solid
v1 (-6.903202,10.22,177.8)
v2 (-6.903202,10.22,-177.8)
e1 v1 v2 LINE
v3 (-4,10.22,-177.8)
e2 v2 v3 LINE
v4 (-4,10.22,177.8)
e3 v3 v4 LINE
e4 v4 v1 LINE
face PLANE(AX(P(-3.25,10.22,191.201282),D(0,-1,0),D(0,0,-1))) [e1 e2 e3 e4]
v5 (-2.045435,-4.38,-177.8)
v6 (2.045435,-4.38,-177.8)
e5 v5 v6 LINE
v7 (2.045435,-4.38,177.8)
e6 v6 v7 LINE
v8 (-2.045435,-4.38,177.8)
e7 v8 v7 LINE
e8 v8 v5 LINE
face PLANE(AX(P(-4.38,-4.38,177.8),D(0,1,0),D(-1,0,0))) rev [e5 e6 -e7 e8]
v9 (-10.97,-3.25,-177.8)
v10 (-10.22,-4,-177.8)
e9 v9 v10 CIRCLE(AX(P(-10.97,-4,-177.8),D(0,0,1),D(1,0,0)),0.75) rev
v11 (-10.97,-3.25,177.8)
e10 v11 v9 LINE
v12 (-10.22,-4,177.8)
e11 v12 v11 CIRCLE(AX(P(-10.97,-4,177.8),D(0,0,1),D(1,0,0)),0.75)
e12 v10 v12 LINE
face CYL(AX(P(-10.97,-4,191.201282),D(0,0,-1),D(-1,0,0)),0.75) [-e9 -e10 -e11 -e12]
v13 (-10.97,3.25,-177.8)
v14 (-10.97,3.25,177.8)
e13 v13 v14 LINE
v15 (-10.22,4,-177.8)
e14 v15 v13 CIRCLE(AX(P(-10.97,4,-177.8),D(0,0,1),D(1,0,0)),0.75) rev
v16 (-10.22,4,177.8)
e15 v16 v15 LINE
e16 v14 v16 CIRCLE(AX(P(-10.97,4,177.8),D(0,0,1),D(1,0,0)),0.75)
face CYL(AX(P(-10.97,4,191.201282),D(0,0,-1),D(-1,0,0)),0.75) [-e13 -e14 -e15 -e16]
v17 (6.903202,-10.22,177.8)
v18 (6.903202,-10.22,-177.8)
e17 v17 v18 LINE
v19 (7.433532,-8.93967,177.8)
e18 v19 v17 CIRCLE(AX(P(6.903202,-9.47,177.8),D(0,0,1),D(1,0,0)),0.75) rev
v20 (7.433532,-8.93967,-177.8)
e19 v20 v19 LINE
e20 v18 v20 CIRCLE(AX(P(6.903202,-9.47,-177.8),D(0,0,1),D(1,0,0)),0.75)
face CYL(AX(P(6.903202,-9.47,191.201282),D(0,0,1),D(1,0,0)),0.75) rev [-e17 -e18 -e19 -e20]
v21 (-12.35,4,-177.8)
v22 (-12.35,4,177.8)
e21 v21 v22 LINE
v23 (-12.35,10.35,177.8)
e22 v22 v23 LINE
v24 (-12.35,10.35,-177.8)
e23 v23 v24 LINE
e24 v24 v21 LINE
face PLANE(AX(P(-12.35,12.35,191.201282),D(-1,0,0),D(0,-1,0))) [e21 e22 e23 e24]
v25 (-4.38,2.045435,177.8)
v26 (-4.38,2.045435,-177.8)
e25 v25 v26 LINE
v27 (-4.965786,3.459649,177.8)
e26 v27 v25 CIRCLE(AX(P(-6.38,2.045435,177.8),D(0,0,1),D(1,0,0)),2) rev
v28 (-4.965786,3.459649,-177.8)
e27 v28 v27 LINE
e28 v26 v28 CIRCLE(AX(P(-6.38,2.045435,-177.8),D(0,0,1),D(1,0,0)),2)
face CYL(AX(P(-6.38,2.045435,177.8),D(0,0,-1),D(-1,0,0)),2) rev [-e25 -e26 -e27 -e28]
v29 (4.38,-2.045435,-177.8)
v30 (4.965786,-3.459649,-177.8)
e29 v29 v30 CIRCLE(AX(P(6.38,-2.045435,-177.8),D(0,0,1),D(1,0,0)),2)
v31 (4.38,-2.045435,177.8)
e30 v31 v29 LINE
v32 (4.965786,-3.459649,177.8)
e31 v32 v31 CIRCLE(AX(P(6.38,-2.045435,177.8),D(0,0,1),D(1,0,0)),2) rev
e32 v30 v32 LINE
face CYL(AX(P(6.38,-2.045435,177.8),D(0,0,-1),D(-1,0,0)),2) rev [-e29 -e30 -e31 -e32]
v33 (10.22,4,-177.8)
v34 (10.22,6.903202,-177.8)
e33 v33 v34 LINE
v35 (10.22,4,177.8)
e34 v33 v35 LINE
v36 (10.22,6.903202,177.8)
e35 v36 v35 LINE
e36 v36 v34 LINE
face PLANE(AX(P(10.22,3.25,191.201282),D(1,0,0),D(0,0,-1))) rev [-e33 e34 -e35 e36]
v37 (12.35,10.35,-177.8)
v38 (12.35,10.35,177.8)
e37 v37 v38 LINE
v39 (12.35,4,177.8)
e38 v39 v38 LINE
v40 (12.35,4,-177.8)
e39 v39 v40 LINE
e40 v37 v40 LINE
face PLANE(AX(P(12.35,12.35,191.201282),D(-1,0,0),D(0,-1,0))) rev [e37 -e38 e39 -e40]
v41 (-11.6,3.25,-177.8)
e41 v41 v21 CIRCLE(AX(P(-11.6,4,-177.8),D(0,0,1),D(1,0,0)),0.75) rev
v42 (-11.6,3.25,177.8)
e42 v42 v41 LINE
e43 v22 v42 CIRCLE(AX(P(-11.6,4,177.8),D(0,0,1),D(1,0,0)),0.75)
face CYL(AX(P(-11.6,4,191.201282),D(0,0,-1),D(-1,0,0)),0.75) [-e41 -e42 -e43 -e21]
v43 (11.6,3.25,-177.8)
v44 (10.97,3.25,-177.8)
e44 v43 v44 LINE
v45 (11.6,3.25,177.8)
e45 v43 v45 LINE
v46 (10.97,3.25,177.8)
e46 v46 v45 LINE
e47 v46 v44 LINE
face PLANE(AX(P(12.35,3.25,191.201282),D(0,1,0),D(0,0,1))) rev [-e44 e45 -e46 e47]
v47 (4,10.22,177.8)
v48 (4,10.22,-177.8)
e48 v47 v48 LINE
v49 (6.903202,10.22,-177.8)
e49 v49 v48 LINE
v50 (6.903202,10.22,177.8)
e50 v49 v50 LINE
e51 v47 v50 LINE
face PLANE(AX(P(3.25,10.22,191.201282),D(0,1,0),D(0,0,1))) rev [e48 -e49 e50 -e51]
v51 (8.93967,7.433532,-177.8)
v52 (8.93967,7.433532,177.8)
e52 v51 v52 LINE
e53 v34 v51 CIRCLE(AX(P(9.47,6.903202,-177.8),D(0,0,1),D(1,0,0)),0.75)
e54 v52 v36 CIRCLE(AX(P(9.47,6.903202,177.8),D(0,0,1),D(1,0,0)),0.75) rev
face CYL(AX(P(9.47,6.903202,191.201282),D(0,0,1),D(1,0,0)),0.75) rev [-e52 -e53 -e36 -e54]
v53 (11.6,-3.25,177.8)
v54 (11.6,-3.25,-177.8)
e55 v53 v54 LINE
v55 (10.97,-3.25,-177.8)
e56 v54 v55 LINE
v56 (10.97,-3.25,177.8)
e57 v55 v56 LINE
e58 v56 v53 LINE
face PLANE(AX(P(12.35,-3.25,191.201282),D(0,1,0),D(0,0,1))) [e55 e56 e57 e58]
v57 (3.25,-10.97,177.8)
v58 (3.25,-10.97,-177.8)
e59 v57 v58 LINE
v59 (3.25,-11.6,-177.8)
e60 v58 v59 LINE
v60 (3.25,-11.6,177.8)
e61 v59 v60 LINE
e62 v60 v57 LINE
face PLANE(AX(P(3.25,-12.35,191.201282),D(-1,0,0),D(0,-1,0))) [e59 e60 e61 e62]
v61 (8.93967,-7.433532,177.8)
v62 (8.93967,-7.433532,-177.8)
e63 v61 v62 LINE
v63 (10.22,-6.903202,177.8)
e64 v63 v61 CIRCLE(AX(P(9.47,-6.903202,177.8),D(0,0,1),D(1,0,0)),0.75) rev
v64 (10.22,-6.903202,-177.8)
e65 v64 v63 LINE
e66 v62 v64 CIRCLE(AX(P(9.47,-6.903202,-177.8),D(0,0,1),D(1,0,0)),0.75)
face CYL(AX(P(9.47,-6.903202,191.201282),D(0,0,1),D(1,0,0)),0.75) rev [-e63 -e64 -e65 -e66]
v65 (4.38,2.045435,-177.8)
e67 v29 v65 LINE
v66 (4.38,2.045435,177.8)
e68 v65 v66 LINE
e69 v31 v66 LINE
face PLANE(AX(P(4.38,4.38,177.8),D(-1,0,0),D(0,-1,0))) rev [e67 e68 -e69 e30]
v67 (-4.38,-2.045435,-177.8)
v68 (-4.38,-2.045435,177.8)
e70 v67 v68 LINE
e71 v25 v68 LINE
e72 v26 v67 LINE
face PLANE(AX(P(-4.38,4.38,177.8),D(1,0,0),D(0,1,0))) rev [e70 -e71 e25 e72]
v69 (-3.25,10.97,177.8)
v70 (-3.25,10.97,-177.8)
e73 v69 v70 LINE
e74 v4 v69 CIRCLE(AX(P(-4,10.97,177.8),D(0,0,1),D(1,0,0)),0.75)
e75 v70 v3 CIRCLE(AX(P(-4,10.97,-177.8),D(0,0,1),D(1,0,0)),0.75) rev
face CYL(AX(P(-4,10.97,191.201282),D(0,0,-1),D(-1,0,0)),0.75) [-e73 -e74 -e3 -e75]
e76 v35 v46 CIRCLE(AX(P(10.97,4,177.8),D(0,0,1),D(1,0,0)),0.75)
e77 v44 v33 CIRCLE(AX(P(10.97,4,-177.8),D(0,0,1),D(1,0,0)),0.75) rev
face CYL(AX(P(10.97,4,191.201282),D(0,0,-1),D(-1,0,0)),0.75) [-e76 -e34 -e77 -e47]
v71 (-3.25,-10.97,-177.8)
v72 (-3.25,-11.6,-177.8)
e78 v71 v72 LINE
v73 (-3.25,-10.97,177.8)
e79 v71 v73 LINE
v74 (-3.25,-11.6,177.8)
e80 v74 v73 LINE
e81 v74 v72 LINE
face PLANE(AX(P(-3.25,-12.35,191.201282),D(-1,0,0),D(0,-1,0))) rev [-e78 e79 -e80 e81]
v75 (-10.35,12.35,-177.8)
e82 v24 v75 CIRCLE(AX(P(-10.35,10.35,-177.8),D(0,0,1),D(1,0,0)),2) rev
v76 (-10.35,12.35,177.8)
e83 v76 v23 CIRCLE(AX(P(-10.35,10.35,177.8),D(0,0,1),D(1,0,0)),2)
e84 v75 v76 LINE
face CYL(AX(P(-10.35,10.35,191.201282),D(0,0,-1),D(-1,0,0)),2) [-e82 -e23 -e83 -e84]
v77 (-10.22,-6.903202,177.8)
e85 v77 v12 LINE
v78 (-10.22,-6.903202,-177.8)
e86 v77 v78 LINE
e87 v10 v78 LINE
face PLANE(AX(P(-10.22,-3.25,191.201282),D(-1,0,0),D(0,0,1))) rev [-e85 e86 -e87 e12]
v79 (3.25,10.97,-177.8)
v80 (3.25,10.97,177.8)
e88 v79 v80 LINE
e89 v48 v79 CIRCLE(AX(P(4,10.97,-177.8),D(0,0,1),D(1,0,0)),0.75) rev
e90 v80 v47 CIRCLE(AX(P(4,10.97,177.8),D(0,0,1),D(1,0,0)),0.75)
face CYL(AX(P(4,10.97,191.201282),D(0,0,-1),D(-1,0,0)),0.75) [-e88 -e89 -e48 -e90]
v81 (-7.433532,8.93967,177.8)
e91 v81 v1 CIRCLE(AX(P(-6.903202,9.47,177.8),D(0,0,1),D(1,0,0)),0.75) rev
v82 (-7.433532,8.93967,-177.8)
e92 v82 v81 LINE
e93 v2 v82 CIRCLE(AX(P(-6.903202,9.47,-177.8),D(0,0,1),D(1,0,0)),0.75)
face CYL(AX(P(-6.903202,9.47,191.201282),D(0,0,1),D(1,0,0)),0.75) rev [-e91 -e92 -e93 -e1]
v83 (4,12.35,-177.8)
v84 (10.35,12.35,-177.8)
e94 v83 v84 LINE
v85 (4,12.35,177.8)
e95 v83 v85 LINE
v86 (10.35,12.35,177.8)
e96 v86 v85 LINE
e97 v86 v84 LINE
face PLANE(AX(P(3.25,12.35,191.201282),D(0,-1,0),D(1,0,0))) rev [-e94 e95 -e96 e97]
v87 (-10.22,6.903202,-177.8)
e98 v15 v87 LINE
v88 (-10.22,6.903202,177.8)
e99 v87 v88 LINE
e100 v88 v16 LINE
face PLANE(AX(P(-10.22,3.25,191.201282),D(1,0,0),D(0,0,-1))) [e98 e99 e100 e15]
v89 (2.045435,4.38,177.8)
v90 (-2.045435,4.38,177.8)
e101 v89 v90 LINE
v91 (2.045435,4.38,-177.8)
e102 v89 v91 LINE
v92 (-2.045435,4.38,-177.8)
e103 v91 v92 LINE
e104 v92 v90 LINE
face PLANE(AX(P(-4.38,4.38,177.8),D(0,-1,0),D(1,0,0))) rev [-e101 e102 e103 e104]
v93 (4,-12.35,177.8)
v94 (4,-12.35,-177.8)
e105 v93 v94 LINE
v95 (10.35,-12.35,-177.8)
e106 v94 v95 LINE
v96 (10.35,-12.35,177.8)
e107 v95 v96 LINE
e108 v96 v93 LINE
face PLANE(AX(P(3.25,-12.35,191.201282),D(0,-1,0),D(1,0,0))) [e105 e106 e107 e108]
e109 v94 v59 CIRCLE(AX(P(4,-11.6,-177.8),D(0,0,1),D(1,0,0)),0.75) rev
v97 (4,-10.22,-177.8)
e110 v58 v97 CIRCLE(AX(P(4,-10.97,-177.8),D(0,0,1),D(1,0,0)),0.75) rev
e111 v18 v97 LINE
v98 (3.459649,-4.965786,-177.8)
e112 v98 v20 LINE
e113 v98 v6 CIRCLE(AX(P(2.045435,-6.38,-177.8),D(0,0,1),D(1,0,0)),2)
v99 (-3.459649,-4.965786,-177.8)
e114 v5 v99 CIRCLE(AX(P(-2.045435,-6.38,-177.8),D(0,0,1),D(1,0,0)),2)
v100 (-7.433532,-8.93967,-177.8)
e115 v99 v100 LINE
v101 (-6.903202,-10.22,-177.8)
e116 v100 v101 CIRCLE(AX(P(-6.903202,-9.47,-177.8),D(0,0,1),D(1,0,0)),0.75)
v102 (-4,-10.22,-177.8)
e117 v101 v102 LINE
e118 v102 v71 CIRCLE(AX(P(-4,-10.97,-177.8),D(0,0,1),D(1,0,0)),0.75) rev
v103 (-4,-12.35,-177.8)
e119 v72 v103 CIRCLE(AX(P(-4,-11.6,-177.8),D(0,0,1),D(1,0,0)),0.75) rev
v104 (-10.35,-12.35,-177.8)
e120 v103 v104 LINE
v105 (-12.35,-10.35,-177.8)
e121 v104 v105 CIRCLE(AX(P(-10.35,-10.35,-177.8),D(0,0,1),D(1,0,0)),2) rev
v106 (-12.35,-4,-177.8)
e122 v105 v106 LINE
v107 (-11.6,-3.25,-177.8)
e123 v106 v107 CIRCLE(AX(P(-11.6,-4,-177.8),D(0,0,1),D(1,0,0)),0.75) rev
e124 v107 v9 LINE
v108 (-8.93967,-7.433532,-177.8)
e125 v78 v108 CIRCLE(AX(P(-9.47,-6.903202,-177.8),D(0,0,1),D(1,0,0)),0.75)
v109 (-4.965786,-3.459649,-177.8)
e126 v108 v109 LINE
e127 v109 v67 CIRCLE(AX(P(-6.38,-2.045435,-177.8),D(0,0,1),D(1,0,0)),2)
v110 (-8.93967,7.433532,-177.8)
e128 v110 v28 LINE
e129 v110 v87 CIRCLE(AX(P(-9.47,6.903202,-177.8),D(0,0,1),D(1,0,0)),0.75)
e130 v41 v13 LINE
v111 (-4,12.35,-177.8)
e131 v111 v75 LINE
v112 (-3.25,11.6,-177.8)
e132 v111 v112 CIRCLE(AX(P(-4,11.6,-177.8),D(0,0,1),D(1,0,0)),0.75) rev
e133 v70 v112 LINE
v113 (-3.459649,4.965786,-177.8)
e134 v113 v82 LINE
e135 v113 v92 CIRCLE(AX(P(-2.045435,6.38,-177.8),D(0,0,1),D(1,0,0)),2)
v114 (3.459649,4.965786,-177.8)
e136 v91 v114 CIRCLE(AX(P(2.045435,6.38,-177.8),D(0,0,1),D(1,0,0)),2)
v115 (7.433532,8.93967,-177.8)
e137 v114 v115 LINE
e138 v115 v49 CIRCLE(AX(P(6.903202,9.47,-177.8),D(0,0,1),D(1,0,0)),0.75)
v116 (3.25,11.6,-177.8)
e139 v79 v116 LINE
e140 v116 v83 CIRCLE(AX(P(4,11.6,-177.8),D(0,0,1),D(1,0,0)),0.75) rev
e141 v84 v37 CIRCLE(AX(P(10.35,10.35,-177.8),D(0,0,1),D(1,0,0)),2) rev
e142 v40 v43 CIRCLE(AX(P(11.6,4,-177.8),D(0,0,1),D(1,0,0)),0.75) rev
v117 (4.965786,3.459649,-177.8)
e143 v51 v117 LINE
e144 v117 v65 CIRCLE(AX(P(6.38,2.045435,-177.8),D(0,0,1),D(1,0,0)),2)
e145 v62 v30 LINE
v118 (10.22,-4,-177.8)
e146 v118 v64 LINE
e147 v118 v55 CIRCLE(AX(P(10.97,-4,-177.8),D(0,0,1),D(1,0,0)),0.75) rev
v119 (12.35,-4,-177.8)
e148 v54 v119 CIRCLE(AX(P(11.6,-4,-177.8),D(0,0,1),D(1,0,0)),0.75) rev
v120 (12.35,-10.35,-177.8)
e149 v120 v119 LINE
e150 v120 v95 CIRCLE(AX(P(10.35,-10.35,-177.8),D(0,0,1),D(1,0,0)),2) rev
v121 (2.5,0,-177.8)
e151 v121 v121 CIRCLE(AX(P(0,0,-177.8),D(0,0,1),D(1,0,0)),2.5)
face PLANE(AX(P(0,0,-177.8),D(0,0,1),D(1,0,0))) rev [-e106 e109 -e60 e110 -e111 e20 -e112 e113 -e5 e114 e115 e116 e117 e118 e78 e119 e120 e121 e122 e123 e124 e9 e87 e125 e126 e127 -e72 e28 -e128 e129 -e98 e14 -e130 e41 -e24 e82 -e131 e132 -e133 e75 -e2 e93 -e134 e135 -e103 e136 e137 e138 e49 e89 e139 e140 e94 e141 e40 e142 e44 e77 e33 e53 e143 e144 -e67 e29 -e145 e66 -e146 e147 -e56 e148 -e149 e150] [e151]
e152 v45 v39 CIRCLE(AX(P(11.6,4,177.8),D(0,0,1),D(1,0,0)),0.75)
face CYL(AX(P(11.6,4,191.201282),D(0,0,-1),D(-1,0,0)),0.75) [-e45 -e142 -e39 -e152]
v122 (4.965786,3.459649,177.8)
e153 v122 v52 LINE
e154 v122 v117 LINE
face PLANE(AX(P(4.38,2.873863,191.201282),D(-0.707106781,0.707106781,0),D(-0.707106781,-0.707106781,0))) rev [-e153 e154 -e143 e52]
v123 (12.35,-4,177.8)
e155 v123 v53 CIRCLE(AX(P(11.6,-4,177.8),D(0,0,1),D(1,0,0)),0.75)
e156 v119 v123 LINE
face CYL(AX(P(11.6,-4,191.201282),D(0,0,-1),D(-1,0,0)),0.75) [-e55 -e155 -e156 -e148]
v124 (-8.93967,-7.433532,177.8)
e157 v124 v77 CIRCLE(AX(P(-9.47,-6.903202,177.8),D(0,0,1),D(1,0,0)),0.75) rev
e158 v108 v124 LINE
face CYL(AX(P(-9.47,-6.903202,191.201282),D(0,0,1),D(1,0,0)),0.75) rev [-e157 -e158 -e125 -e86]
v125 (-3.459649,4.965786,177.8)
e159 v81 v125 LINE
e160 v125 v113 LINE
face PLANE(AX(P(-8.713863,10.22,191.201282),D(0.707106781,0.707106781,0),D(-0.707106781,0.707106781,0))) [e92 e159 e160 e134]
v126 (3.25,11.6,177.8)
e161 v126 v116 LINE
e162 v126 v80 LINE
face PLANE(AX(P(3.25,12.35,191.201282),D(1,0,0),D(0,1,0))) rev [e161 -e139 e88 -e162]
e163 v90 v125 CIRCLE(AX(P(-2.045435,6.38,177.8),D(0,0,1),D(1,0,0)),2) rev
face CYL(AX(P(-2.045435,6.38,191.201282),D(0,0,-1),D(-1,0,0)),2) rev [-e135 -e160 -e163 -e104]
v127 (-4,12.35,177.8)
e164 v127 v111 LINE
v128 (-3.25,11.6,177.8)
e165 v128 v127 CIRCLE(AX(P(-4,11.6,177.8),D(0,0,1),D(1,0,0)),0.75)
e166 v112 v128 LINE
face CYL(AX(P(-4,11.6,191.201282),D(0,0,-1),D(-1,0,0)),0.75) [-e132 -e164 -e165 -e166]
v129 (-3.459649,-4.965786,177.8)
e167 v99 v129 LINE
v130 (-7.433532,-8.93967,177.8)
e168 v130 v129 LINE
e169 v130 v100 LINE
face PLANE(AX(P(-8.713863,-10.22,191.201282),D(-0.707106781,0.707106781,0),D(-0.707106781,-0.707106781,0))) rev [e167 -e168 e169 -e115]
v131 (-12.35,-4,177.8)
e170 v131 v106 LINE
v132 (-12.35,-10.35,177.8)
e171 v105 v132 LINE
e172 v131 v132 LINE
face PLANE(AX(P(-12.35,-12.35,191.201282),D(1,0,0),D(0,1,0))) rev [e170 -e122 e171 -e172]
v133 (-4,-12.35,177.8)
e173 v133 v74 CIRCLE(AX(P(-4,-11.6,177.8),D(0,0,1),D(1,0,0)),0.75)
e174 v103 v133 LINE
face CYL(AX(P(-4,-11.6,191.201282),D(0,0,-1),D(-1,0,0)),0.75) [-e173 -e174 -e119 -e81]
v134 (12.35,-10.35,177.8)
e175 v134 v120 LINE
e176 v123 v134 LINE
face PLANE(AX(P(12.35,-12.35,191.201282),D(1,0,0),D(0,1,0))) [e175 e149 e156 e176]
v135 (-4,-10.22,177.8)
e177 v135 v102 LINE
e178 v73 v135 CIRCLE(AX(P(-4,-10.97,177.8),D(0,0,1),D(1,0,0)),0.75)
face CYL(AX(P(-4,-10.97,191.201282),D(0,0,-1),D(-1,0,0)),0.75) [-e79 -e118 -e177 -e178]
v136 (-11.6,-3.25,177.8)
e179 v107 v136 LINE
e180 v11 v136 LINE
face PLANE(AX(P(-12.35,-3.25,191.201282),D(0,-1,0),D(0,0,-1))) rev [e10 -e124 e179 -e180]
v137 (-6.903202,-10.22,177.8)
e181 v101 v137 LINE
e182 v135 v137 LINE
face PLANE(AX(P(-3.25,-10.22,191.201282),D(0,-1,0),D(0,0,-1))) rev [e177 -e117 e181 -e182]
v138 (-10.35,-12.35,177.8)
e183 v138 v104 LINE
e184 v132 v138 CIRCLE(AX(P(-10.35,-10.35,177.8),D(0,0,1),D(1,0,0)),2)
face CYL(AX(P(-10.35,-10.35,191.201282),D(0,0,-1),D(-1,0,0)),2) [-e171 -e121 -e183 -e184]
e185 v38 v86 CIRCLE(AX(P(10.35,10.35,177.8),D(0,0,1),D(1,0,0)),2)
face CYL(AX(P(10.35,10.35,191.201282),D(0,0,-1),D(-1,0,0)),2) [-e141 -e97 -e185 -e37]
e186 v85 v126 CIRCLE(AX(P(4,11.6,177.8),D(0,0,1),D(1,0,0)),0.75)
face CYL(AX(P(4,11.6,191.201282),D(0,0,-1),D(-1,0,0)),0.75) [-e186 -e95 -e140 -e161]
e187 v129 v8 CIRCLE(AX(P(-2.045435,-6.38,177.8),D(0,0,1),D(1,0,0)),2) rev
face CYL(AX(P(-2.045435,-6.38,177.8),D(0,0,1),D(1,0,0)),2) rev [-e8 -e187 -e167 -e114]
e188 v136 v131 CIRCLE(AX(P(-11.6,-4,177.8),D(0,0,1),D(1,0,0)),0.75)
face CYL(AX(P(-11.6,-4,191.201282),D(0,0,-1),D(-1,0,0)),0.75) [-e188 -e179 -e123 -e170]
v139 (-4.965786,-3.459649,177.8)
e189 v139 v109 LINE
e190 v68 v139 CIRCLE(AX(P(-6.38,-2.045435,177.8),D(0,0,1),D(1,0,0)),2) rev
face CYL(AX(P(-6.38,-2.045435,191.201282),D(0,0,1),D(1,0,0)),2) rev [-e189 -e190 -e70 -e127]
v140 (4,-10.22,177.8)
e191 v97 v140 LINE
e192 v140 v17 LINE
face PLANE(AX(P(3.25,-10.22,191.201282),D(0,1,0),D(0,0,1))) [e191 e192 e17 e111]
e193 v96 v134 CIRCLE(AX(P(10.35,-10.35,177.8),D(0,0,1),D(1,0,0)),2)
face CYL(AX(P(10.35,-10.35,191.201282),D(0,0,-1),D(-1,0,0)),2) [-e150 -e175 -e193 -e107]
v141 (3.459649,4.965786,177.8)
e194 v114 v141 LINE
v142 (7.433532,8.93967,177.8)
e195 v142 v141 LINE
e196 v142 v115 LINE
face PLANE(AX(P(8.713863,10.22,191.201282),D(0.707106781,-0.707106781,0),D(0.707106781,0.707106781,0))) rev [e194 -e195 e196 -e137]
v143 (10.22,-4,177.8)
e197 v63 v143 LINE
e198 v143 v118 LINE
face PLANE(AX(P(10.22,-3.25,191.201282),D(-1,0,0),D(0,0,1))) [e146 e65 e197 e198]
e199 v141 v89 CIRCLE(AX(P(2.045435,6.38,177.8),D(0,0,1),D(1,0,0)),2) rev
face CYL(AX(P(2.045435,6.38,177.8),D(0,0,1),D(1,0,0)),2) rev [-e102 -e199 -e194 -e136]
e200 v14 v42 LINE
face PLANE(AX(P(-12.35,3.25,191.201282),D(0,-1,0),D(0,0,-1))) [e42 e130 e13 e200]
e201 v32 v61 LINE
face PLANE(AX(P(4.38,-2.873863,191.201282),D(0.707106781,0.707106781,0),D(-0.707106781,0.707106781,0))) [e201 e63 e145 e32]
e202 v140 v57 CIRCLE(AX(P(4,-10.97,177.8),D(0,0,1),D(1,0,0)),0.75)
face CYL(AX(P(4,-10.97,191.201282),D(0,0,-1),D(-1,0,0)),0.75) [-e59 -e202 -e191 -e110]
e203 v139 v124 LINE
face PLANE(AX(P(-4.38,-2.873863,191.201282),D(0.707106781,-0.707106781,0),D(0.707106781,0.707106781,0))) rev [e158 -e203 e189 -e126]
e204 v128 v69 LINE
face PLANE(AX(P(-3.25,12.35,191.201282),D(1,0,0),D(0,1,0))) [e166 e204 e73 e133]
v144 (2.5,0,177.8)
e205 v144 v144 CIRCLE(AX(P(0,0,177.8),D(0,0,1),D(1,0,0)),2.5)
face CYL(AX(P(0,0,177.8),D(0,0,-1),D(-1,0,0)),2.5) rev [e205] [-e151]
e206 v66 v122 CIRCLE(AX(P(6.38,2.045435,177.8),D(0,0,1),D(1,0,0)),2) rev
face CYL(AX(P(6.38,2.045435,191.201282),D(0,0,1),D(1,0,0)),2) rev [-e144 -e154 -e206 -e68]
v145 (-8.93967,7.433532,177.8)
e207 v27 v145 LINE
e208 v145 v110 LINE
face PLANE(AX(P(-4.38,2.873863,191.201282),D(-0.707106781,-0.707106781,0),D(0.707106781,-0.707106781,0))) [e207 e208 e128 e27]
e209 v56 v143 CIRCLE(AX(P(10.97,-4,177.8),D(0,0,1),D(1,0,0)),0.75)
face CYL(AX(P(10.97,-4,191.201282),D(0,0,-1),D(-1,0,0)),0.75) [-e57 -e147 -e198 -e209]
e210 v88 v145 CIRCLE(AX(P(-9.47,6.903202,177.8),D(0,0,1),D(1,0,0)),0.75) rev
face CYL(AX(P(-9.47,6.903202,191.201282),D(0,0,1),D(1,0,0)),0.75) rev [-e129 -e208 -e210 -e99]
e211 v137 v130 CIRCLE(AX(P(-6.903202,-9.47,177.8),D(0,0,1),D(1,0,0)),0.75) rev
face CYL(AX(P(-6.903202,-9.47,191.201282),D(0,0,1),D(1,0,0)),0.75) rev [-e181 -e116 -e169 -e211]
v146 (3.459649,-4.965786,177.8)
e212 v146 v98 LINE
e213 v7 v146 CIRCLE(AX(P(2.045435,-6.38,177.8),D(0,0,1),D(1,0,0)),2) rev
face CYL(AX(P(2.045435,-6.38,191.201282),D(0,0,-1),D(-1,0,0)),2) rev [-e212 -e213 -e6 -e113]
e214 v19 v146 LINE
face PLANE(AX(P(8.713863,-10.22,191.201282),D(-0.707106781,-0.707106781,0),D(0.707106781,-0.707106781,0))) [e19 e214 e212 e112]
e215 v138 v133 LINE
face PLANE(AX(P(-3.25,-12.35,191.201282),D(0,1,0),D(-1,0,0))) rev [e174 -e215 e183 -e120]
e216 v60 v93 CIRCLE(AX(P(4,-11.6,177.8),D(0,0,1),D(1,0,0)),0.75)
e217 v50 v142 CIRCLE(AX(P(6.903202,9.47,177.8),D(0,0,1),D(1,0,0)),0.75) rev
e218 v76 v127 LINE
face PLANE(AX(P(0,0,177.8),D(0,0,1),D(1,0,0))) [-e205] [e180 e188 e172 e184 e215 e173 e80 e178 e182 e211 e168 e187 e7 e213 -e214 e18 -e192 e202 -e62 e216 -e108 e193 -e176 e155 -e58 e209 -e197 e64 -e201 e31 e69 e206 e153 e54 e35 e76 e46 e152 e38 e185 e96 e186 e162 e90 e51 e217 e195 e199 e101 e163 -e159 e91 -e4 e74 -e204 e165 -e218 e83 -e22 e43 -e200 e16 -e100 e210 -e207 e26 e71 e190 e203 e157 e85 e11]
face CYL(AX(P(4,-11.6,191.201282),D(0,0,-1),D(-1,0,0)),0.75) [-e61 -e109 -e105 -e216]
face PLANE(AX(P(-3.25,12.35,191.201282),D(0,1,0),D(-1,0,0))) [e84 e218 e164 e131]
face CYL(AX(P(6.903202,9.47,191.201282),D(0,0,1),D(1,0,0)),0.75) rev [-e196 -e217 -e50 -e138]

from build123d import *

# Parameters (mm, degrees)
SKETCH2_W            = 8.76
SKETCH2_H            = 8.76
SKETCH2_R            = 2.5
BOSS_EXTRUDE1_DEPTH  = 177.8
BOSS_EXTRUDE2_START  = -177.8
BOSS_EXTRUDE2_DEPTH  = 355.6
FILLET1_R            = 0.75
FILLET1_OF_MIRROR1_R = 0.75
MIRROR2_START        = -177.8
MIRROR2_DEPTH        = 355.6
FILLET2_R            = 2


# Read off the part's stored shape, not the designer's step: Mirror2
with BuildPart() as part:
    # Sketch2 → Boss-Extrude1 (new, symmetric)
    with BuildSketch(Plane.XY):
        Rectangle(SKETCH2_W, SKETCH2_H)
        Circle(SKETCH2_R, mode=Mode.SUBTRACT)
    extrude(amount=BOSS_EXTRUDE1_DEPTH, both=True)

    # Sketch3 → Boss-Extrude2 (add)
    with BuildSketch(Plane.XY.offset(BOSS_EXTRUDE2_START)):
        Polygon((3.25, 12.35), (12.35, 12.35), (12.35, 3.25), (10.22, 3.25), (10.22, 8.713862556), (4.38, 2.873862556), (4.38, 4.38), (2.873862556, 4.38), (8.713862556, 10.22), (3.25, 10.22), align=None)
    boss_extrude2 = extrude(amount=BOSS_EXTRUDE2_DEPTH)

    # Fillet1
    fillet1_edges = [part.edges().sort_by_distance(p)[0] for p in [
        (3.25, 12.35, 0),
        (3.25, 10.22, 0),
        (8.713862556, 10.22, 0),
        (10.22, 8.713862556, 0),
        (10.22, 3.25, 0),
        (12.35, 3.25, 0),
    ]]
    fillet(fillet1_edges, radius=FILLET1_R)

    # Mirror1: Boss-Extrude2 across plane
    add(boss_extrude2.mirror(Plane.ZX))

    # Fillet1 of Mirror1
    fillet1_of_mirror1_edges = [part.edges().sort_by_distance(p)[0] for p in [
        (3.25, -12.35, 0),
        (3.25, -10.22, 0),
        (8.713862556, -10.22, 0),
        (10.22, -8.713862556, 0),
        (10.22, -3.25, 0),
        (12.35, -3.25, 0),
    ]]
    fillet(fillet1_of_mirror1_edges, radius=FILLET1_OF_MIRROR1_R)

    # Mirror2 outline → Mirror2 (add)
    with BuildSketch(Plane.XY.offset(MIRROR2_START)):
        with BuildLine():
            ThreePointArc((-7.43353247, 8.939669914), (-7.596112034, 9.757012574), (-6.903202384, 10.22))
            Line((-6.903202384, 10.22), (-4, 10.22))
            ThreePointArc((-4, 10.22), (-3.469669914, 10.439669914), (-3.25, 10.97))
            Line((-3.25, 10.97), (-3.25, 11.6))
            ThreePointArc((-3.25, 11.6), (-3.469669914, 12.130330086), (-4, 12.35))
            Line((-4, 12.35), (-12.35, 12.35))
            Line((-12.35, 12.35), (-12.35, 4))
            ThreePointArc((-12.35, 4), (-12.130330086, 3.469669914), (-11.6, 3.25))
            Line((-11.6, 3.25), (-10.97, 3.25))
            ThreePointArc((-10.97, 3.25), (-10.439669914, 3.469669914), (-10.22, 4))
            Line((-10.22, 4), (-10.22, 6.903202384))
            ThreePointArc((-10.22, 6.903202384), (-9.757012574, 7.596112034), (-8.939669914, 7.43353247))
            Line((-8.939669914, 7.43353247), (-4.38, 2.873862556))
            Line((-4.38, 2.873862556), (-4.38, 4.38))
            Line((-4.38, 4.38), (-2.873862556, 4.38))
            Line((-2.873862556, 4.38), (-7.43353247, 8.939669914))
        make_face()
        with BuildLine():
            Line((-4.38, -4.38), (-4.38, -2.873862556))
            Line((-4.38, -2.873862556), (-8.939669914, -7.43353247))
            ThreePointArc((-8.939669914, -7.43353247), (-9.757012574, -7.596112034), (-10.22, -6.903202384))
            Line((-10.22, -6.903202384), (-10.22, -4))
            ThreePointArc((-10.22, -4), (-10.439669914, -3.469669914), (-10.97, -3.25))
            Line((-10.97, -3.25), (-11.6, -3.25))
            ThreePointArc((-11.6, -3.25), (-12.130330086, -3.469669914), (-12.35, -4))
            Line((-12.35, -4), (-12.35, -12.35))
            Line((-12.35, -12.35), (-4, -12.35))
            ThreePointArc((-4, -12.35), (-3.469669914, -12.130330086), (-3.25, -11.6))
            Line((-3.25, -11.6), (-3.25, -10.97))
            ThreePointArc((-3.25, -10.97), (-3.469669914, -10.439669914), (-4, -10.22))
            Line((-4, -10.22), (-6.903202384, -10.22))
            ThreePointArc((-6.903202384, -10.22), (-7.596112034, -9.757012574), (-7.43353247, -8.939669914))
            Line((-7.43353247, -8.939669914), (-2.873862556, -4.38))
            Line((-2.873862556, -4.38), (-4.38, -4.38))
        make_face()
    extrude(amount=MIRROR2_DEPTH)

    # Fillet2
    fillet2_edges = [part.edges().sort_by_distance(p)[0] for p in [
        (-2.873862556, -4.38, 0),
        (-4.38, -2.873862556, 0),
        (-12.35, -12.35, 0),
        (2.873862556, 4.38, 0),
        (4.38, 2.873862556, 0),
        (12.35, 12.35, 0),
        (-2.873862556, 4.38, 0),
        (-4.38, 2.873862556, 0),
        (-12.35, 12.35, 0),
        (2.873862556, -4.38, 0),
        (4.38, -2.873862556, 0),
        (12.35, -12.35, 0),
    ]]
    fillet(fillet2_edges, radius=FILLET2_R)


solid = part.part
